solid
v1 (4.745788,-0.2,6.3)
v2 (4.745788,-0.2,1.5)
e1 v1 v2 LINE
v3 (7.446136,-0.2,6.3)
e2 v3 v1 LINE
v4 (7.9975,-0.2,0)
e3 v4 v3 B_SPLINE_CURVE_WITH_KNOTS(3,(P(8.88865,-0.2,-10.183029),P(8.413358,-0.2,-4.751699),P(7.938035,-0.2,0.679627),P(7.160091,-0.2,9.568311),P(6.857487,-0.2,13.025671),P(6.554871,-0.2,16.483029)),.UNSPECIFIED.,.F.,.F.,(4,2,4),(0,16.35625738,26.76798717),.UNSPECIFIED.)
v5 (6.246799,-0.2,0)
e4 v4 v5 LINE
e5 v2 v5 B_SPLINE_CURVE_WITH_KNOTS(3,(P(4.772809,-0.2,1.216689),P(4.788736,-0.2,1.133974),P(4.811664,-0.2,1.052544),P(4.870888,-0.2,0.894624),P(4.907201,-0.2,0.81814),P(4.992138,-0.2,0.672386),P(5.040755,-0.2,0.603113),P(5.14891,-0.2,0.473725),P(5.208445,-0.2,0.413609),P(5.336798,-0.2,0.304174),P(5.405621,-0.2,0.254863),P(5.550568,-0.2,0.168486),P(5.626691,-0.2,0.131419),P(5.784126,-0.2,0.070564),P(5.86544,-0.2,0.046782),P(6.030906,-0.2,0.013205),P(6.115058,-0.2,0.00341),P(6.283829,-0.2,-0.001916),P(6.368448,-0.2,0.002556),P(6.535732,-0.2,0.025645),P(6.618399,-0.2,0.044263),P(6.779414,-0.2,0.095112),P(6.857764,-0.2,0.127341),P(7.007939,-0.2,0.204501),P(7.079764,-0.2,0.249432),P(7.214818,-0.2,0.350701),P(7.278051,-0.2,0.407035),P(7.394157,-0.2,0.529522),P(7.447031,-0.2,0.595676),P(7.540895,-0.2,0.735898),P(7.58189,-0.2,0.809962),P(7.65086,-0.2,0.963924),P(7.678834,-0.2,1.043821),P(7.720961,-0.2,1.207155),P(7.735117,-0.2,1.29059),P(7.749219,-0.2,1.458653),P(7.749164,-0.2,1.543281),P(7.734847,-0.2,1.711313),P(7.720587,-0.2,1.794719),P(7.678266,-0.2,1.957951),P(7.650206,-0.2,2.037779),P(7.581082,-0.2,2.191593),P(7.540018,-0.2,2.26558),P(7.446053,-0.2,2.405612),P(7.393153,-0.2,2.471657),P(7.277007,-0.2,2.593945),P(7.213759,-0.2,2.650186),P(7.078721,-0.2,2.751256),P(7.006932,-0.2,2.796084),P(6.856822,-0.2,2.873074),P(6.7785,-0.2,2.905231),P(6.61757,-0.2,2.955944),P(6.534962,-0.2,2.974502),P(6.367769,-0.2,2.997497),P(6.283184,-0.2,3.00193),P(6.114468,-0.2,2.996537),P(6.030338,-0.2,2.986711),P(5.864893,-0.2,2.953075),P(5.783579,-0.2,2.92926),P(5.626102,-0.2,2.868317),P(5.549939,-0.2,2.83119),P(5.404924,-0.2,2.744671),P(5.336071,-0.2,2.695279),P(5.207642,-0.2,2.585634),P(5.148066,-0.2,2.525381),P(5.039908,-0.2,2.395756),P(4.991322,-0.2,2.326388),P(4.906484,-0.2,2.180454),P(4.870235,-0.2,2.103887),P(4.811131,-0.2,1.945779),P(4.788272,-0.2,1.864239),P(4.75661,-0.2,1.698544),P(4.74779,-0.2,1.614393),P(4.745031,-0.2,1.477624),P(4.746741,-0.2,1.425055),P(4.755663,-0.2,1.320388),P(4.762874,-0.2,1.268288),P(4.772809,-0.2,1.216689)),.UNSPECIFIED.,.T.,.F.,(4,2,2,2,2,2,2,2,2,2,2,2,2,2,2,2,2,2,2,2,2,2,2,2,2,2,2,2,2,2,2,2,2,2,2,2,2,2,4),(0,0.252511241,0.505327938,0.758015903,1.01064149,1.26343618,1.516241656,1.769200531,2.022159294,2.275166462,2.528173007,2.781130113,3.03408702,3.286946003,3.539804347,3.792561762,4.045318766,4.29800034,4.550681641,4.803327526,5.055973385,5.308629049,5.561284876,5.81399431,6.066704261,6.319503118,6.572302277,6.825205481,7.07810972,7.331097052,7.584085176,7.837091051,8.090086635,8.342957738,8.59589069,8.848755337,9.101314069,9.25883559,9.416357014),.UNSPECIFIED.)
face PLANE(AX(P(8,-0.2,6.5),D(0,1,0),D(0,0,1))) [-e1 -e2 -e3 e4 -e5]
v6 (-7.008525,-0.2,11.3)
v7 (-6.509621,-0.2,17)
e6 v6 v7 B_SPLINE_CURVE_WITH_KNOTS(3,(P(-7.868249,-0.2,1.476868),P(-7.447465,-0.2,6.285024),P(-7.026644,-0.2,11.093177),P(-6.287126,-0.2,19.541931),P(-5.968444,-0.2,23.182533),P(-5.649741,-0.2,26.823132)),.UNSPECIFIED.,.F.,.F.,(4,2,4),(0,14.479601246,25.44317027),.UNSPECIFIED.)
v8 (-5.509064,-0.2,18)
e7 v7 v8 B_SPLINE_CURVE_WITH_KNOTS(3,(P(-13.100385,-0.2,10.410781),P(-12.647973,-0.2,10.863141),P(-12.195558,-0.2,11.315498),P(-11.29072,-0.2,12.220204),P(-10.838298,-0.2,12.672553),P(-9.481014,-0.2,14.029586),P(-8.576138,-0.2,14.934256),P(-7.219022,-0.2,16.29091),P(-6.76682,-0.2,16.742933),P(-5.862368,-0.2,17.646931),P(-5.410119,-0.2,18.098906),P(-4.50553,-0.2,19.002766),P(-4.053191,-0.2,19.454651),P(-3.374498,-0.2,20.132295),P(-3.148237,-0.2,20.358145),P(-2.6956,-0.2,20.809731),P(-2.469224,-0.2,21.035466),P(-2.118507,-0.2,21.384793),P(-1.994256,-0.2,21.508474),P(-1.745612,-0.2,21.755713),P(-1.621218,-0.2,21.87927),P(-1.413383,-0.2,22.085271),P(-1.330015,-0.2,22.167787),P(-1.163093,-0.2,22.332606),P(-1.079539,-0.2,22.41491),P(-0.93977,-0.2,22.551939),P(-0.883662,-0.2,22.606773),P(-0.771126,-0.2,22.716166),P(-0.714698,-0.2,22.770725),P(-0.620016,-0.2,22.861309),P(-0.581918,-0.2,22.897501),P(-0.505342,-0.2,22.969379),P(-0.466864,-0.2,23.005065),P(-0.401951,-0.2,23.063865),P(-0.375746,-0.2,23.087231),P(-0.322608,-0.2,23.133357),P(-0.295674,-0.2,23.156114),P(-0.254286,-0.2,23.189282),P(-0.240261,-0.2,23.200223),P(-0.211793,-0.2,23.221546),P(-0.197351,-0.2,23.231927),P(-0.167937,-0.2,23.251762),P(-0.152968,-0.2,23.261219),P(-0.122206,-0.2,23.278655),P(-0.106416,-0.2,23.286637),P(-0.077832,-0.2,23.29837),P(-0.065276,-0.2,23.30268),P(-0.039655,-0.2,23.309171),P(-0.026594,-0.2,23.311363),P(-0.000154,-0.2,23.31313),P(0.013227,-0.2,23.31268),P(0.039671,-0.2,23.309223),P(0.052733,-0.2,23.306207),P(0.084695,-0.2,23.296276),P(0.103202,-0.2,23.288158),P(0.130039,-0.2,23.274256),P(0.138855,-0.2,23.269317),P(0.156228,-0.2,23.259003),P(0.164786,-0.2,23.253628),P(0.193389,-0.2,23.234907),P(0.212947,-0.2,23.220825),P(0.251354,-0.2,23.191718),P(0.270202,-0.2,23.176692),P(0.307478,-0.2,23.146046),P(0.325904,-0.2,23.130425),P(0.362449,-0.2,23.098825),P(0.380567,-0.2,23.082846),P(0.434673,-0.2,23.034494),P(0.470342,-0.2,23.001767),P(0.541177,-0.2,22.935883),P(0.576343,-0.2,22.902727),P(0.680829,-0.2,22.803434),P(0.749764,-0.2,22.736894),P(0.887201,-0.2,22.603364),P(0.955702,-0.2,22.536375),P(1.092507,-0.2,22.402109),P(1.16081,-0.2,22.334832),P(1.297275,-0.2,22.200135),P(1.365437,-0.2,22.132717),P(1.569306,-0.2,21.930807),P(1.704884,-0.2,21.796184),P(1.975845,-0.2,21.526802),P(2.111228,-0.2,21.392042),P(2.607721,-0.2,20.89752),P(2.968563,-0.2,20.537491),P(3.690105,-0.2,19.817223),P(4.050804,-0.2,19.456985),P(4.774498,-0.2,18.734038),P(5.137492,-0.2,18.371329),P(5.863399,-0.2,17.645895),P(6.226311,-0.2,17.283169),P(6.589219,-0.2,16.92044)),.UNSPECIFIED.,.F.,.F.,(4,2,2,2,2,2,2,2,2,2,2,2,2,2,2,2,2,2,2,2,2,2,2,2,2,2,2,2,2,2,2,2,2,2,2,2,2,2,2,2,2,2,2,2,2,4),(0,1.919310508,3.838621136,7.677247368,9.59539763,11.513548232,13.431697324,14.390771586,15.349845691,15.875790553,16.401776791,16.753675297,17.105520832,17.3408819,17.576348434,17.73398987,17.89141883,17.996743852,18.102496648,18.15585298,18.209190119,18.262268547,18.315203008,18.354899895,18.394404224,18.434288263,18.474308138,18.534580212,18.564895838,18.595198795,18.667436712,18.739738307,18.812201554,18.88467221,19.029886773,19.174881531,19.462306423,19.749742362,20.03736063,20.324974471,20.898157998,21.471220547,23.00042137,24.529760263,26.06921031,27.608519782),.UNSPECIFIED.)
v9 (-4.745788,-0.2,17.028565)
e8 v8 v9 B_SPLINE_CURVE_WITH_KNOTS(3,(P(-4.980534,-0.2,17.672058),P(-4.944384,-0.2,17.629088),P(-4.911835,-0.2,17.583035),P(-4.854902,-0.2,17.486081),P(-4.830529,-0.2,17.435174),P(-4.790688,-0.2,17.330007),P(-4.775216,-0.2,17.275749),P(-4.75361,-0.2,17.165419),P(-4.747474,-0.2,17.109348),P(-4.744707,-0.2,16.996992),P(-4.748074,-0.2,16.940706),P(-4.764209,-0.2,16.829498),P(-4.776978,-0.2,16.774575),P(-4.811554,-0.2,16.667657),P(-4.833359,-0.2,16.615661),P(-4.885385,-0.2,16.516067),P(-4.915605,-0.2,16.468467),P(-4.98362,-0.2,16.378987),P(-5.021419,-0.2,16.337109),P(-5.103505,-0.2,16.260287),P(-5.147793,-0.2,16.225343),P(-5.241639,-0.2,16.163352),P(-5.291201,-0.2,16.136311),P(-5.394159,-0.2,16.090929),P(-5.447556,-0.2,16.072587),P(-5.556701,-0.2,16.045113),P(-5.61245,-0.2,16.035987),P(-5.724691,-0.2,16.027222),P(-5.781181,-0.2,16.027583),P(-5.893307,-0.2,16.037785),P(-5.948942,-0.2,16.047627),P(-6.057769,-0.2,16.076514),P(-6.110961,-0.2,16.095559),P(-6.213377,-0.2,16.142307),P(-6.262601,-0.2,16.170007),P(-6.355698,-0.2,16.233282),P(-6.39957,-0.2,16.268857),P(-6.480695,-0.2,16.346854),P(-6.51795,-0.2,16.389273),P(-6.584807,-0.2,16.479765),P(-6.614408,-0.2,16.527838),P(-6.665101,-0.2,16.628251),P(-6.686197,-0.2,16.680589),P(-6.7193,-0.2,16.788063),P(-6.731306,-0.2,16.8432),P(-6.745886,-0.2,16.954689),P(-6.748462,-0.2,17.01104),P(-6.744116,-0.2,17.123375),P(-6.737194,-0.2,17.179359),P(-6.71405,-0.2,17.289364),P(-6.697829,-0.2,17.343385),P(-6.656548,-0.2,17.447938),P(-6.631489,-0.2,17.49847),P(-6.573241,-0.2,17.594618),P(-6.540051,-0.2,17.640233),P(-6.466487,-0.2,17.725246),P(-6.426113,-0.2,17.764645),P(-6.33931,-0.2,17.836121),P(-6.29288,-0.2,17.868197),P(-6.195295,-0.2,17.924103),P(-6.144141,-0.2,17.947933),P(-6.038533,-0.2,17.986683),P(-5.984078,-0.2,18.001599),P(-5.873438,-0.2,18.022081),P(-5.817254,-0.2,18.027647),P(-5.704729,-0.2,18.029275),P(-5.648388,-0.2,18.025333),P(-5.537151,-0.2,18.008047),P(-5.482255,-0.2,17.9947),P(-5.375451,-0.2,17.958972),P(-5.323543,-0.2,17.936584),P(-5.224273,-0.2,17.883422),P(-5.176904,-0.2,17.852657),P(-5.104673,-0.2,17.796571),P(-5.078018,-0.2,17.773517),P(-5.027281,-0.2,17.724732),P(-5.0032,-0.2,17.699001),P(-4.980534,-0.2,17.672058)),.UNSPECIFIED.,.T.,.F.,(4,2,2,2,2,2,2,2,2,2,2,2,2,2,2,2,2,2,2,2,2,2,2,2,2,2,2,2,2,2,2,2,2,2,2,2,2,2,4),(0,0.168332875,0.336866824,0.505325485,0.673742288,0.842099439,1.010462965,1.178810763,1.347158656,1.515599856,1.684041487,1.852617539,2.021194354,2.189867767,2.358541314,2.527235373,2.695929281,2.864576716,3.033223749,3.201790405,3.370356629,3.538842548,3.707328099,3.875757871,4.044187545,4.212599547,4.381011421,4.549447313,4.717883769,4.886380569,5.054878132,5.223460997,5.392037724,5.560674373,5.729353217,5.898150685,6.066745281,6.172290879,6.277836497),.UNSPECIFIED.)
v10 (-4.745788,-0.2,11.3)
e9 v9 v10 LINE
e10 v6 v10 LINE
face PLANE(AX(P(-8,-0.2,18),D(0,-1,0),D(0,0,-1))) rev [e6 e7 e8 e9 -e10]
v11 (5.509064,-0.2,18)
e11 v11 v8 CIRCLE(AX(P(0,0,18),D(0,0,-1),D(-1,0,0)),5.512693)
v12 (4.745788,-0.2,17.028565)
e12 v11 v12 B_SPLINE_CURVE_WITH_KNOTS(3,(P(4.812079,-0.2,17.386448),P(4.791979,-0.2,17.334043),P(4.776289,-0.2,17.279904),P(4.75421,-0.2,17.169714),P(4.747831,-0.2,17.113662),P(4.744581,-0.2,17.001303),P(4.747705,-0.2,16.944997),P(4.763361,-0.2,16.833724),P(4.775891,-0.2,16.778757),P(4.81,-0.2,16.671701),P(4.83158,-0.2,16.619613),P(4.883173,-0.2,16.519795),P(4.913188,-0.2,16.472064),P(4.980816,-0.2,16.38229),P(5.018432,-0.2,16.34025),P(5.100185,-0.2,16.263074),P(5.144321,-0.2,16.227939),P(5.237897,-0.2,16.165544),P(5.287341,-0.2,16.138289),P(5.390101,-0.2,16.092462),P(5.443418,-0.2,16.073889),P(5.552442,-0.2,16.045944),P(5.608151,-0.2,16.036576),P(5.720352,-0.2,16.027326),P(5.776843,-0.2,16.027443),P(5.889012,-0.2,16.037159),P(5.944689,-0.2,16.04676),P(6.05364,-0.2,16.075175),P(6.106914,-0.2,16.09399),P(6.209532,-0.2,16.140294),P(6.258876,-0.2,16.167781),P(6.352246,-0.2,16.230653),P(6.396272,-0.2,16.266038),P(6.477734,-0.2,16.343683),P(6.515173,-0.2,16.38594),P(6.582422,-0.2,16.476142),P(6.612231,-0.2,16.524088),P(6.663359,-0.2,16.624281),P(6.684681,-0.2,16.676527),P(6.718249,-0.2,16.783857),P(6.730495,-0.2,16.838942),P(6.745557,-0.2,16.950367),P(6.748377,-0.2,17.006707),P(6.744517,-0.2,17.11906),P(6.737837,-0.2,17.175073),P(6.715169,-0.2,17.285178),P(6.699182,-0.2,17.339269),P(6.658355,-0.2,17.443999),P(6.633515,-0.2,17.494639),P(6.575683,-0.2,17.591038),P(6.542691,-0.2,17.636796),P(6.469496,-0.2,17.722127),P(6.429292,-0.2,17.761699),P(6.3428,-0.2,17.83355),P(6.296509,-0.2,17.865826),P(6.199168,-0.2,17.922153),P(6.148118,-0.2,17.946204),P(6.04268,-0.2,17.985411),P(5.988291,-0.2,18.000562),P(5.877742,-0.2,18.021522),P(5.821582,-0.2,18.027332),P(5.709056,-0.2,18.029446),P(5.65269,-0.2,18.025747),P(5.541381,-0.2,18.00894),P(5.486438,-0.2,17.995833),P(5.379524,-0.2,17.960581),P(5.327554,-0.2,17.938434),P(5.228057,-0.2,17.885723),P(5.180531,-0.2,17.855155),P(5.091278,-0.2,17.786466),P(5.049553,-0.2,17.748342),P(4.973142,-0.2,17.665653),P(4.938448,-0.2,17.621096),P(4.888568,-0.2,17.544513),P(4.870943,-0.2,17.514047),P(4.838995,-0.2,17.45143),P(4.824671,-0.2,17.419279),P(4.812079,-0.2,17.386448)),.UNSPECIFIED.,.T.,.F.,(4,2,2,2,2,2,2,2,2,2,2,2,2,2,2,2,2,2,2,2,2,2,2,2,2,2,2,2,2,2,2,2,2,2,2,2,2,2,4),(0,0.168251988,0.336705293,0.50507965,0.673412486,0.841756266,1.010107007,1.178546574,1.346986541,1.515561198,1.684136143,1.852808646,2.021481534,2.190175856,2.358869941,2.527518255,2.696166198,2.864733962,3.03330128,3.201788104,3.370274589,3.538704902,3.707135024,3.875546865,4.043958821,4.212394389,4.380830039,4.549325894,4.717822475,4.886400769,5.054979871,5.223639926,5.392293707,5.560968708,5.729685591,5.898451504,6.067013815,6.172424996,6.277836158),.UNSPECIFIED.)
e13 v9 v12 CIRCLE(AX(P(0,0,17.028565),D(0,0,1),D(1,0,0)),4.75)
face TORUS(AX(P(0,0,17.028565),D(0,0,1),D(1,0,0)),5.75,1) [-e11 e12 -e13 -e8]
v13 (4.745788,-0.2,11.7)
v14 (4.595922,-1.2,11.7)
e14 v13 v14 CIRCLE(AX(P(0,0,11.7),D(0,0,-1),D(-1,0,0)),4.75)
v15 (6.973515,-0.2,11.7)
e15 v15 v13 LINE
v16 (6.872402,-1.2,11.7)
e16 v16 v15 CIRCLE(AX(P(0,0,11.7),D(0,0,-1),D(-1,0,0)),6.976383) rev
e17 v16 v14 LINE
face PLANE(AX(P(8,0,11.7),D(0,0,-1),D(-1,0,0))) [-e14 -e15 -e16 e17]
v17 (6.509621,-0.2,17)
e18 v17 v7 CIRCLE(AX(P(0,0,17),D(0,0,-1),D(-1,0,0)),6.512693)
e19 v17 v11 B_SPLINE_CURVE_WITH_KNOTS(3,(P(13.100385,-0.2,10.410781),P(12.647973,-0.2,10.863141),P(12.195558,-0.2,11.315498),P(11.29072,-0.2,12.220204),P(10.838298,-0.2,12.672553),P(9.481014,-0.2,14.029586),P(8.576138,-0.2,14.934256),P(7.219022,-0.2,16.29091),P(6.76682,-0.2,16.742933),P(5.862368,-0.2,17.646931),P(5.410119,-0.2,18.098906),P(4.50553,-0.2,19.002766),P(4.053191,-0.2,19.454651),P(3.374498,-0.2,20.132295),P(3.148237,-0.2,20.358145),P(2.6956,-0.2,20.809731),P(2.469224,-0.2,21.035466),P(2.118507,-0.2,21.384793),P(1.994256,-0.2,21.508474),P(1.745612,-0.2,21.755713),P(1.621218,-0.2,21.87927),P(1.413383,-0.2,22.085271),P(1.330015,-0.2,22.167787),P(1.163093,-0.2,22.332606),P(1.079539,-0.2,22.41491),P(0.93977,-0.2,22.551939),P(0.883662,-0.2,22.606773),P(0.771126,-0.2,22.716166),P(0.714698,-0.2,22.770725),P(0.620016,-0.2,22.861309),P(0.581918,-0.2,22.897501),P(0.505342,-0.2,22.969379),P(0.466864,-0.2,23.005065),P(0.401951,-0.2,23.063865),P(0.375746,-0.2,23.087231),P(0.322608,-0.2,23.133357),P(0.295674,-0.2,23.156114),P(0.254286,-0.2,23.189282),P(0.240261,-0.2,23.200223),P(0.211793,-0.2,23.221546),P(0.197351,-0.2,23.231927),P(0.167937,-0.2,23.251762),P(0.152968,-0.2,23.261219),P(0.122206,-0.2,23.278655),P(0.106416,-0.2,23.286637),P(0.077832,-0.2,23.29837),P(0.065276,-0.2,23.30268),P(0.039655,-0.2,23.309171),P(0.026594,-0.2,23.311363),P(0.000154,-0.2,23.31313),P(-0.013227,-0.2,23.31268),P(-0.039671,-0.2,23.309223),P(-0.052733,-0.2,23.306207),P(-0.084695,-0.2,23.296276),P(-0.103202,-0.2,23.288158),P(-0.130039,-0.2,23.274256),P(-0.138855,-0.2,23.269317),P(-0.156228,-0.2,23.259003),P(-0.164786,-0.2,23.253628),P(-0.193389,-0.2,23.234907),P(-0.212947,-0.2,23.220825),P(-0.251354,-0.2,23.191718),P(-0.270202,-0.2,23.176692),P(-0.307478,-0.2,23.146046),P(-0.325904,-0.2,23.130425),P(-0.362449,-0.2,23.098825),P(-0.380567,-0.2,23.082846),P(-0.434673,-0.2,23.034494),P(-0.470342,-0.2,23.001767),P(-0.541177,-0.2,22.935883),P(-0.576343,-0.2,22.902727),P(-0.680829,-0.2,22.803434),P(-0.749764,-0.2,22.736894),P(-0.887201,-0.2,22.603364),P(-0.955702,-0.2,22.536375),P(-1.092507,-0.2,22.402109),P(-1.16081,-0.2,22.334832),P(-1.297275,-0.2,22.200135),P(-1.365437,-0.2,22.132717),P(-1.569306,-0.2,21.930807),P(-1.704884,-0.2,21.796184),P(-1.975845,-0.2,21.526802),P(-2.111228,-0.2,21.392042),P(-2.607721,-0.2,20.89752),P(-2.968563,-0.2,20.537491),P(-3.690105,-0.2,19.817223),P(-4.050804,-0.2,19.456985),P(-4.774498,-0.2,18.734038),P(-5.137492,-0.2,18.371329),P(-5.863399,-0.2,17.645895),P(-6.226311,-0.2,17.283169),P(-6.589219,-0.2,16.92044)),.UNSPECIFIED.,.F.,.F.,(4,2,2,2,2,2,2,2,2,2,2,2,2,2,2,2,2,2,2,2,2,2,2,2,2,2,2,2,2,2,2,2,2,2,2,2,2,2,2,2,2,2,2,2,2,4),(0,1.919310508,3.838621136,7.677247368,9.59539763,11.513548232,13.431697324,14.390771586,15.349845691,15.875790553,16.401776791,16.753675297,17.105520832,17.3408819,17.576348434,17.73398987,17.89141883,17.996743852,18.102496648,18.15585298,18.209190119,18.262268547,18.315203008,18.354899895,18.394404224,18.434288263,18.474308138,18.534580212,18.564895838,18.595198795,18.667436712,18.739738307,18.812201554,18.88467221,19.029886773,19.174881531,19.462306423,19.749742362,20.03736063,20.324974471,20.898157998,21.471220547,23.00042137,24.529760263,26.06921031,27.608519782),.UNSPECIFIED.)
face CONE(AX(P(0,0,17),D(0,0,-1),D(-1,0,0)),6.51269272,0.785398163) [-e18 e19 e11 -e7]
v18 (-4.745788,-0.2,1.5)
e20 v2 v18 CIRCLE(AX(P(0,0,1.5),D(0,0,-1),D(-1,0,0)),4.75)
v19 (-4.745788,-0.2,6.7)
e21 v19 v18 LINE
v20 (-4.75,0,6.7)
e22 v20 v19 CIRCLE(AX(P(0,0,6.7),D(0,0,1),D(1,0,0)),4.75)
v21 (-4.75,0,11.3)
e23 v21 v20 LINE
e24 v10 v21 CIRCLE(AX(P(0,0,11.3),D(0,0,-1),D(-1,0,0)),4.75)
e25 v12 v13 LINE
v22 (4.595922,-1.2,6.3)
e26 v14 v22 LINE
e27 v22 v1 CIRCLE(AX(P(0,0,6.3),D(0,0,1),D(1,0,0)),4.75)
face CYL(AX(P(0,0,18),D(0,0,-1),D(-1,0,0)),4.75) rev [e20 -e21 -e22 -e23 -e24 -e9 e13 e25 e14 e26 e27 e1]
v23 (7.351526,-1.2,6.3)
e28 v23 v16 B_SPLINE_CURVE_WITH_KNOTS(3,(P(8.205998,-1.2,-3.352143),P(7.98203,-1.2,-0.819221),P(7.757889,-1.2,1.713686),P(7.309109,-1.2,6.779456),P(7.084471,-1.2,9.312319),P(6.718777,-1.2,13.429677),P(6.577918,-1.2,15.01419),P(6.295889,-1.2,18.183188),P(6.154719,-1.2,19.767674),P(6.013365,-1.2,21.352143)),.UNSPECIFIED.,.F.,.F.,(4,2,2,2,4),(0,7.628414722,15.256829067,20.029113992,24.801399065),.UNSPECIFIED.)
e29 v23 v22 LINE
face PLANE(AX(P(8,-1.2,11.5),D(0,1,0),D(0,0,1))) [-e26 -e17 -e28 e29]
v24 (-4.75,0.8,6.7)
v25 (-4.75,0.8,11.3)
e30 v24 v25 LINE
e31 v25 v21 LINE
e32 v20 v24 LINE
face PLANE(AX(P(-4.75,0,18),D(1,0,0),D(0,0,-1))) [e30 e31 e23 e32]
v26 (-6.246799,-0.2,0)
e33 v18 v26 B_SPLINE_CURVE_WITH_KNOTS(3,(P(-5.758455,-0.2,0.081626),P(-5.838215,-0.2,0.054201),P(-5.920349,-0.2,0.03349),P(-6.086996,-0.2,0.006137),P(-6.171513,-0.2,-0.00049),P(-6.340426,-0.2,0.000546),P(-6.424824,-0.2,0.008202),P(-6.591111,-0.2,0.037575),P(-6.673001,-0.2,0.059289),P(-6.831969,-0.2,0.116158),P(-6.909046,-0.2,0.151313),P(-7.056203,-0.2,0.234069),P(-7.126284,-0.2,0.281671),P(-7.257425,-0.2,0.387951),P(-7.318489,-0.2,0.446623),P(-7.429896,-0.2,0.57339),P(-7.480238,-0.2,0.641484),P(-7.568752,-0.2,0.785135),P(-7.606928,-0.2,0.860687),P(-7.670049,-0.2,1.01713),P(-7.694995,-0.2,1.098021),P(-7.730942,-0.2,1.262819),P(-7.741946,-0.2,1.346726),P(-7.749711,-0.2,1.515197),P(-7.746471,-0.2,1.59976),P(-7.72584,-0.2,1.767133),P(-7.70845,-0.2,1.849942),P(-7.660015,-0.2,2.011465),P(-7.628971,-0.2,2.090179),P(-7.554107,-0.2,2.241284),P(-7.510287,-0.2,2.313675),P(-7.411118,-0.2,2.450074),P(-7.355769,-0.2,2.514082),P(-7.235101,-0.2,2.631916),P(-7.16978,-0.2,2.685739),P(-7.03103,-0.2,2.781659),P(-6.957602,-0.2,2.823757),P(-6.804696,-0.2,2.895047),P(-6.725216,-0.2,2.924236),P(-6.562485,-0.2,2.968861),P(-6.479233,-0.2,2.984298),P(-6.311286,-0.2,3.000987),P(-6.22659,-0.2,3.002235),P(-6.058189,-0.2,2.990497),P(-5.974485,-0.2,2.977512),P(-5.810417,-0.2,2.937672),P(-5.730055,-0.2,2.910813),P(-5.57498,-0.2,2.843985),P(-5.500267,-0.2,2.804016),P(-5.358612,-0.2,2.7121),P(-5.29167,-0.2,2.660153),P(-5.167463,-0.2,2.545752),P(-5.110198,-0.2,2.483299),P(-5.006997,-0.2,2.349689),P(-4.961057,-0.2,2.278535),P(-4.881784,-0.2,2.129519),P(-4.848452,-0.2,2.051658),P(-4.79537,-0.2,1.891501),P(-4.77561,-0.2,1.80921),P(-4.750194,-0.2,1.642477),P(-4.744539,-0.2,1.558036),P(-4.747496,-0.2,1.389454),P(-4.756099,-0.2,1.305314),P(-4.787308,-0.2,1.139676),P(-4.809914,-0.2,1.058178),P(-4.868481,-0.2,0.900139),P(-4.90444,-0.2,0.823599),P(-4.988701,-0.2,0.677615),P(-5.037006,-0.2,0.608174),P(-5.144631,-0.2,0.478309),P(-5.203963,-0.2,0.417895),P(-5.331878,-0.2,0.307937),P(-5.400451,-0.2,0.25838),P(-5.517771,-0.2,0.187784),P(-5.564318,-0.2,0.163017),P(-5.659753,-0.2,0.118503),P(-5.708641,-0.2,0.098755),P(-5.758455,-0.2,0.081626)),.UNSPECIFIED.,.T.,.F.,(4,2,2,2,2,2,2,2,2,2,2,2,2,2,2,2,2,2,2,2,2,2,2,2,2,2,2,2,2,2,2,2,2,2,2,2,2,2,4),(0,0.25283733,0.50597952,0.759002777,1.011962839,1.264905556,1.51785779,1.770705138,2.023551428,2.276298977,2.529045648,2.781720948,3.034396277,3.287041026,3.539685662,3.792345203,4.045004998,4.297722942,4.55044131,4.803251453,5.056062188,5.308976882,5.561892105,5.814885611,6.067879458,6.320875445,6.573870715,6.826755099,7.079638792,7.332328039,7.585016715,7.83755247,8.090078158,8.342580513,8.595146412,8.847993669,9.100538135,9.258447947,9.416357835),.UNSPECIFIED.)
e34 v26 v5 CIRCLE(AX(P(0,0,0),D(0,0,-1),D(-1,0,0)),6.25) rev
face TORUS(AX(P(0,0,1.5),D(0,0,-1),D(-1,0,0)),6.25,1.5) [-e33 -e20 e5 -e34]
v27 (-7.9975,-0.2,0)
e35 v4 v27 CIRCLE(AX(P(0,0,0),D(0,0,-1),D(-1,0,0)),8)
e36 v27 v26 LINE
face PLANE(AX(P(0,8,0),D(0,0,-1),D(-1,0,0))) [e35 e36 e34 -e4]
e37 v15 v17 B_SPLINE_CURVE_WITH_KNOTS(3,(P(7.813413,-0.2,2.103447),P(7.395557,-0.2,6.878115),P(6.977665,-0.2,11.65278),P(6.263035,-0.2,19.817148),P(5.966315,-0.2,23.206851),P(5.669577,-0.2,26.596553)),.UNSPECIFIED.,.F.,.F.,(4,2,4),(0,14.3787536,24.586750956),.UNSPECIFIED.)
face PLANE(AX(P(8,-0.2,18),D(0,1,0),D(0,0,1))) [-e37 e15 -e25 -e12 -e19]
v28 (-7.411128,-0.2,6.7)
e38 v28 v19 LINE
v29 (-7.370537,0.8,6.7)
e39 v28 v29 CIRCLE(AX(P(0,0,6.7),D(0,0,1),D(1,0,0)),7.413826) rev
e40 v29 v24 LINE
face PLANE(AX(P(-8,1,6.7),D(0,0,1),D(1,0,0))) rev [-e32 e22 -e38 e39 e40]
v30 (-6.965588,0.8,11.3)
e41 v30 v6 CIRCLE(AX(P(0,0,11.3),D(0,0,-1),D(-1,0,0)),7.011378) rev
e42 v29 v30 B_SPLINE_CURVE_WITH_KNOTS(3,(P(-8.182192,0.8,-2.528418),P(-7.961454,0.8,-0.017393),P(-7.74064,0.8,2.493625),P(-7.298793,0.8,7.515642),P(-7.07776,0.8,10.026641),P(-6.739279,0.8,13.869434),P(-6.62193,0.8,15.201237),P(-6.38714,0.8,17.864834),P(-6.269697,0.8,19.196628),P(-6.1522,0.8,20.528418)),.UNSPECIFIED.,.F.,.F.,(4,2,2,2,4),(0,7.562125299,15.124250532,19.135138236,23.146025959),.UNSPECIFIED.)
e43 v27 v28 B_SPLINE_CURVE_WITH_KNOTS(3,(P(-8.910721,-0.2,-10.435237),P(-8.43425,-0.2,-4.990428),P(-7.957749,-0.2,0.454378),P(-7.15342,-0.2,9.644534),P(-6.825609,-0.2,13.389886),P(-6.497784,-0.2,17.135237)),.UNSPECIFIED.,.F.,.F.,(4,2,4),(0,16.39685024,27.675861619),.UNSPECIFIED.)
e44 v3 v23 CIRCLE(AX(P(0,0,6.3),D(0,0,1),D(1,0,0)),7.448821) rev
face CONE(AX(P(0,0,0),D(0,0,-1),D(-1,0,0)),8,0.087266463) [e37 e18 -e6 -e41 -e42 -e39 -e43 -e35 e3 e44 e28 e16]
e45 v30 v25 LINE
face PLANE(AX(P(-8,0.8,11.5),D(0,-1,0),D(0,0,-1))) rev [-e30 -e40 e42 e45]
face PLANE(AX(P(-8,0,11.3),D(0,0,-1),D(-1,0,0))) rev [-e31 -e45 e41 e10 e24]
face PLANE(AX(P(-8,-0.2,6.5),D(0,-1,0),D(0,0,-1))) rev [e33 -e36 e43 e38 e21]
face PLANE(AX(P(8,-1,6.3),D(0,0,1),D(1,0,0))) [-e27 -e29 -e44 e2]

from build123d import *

# Parameters (mm, degrees)
SKETCH3_R               = 4.75
WIRE_HOLE_CUT_DEPTH     = 22.260291625
FRONT_STRAIN_FILLET_R   = 1
REAR_STRAIN_FILLET_R    = 1.5
SPLIT_CUT_1_DEPTH       = 22.260291625
SPLIT_CUT_2_DEPTH       = 22.26029171
WIRE_INSERT_NOTCH_DEPTH = 22.259351006


with BuildPart() as part:
    # Sketch2 → Body Revolve1 (revolve)
    with BuildSketch(Plane(origin=(0, 0, 0), x_dir=(0, 0, -1), z_dir=(1, 0, 0)), mode=Mode.PRIVATE) as body_revolve1_sk:
        Polygon((0, 0), (-18, 0), (-18, 5.51269272), (-17, 6.51269272), (0, 8), align=None)
    revolve(body_revolve1_sk.sketch.rotate(Axis((0, 0, 18), (0, 0, 1)), 90), axis=Axis((0, 0, 18), (0, 0, 1)))

    # Sketch3 → Wire Hole Cut (cut, through all)
    with BuildSketch(Plane.XY):
        Circle(SKETCH3_R)
    extrude(amount=WIRE_HOLE_CUT_DEPTH, mode=Mode.SUBTRACT)

    # Front Strain Fillet
    # the kernel refuses this fillet: 1 mm, written as the material it takes off along each edge
    with BuildSketch(Plane(origin=(0, 0, 18), x_dir=(1, 0, 0), z_dir=(0, 1, 0))) as front_strain_fillet_piece_1:
        with BuildLine():
            CenterArc((5.75, 0.971434637), FRONT_STRAIN_FILLET_R, 180, 76.272331842)
            Line((4.75, 0.971434637), (4.73, 0.971434637))
            Line((4.73, 0.971434637), (4.73, 0))
            Line((4.73, 0), (4.75, -0.02))
            ThreePointArc((4.75, -0.02), (5.13134636, -0.02), (5.507946574, -0.019428693))
            Line((5.507946574, -0.019428693), (5.51269272, 0))
        make_face()
    revolve(axis=Axis((0, 0, 18), (0, 0, -1)), mode=Mode.SUBTRACT)

    # Rear Strain Fillet
    rear_strain_fillet_edges = [part.edges().sort_by_distance(p)[0] for p in [
        (-4.75, 0, 0),
    ]]
    fillet(rear_strain_fillet_edges, radius=REAR_STRAIN_FILLET_R)

    # Sketch5 → Split Cut 1 (cut, through all)
    with BuildSketch(Plane(origin=(0, 0, 0), x_dir=(0, 0, -1), z_dir=(1, 0, 0))):
        Polygon((-18, 0), (-11.5, 0), (-11.5, 1), (-6.5, 1), (-6.5, 0), (0, 0), (0, -0.2), (-6.7, -0.2), (-6.7, 0.8), (-11.3, 0.8), (-11.3, -0.2), (-18, -0.2), align=None)
    extrude(amount=-SPLIT_CUT_1_DEPTH, mode=Mode.SUBTRACT)

    # Sketch7 → Split Cut 2 (cut, through all)
    with BuildSketch(Plane(origin=(0, 0, 0), x_dir=(0, 0, -1), z_dir=(1, 0, 0))):
        Polygon((-18, 0), (-11.5, 0), (-11.5, -1), (-6.5, -1), (-6.5, 0), (0, 0), (0, -0.2), (-6.3, -0.2), (-6.3, -1.2), (-11.7, -1.2), (-11.7, -0.2), (-18, -0.2), align=None)
    extrude(amount=SPLIT_CUT_2_DEPTH, mode=Mode.SUBTRACT)


with BuildPart() as split_cut_2_kept_piece:
    # of the separate pieces the step leaves, the one the design keeps (split_cut_2_pieces_kept)
    add(part.part.solids().sort_by_distance((6.24679918, -0.2, 0))[0])

    # Sketch6 → Wire Insert Notch (cut, through all)
    with BuildSketch(Plane.XY):
        with BuildLine():
            Line((-4.75, 0), (-4.75, 2))
            Line((-4.75, 2), (4.75, 2))
            Line((4.75, 2), (4.75, 0))
            ThreePointArc((4.75, 0), (0, -4.75), (-4.75, 0))
        make_face()
    extrude(amount=WIRE_INSERT_NOTCH_DEPTH, mode=Mode.SUBTRACT)


solid = split_cut_2_kept_piece.part
